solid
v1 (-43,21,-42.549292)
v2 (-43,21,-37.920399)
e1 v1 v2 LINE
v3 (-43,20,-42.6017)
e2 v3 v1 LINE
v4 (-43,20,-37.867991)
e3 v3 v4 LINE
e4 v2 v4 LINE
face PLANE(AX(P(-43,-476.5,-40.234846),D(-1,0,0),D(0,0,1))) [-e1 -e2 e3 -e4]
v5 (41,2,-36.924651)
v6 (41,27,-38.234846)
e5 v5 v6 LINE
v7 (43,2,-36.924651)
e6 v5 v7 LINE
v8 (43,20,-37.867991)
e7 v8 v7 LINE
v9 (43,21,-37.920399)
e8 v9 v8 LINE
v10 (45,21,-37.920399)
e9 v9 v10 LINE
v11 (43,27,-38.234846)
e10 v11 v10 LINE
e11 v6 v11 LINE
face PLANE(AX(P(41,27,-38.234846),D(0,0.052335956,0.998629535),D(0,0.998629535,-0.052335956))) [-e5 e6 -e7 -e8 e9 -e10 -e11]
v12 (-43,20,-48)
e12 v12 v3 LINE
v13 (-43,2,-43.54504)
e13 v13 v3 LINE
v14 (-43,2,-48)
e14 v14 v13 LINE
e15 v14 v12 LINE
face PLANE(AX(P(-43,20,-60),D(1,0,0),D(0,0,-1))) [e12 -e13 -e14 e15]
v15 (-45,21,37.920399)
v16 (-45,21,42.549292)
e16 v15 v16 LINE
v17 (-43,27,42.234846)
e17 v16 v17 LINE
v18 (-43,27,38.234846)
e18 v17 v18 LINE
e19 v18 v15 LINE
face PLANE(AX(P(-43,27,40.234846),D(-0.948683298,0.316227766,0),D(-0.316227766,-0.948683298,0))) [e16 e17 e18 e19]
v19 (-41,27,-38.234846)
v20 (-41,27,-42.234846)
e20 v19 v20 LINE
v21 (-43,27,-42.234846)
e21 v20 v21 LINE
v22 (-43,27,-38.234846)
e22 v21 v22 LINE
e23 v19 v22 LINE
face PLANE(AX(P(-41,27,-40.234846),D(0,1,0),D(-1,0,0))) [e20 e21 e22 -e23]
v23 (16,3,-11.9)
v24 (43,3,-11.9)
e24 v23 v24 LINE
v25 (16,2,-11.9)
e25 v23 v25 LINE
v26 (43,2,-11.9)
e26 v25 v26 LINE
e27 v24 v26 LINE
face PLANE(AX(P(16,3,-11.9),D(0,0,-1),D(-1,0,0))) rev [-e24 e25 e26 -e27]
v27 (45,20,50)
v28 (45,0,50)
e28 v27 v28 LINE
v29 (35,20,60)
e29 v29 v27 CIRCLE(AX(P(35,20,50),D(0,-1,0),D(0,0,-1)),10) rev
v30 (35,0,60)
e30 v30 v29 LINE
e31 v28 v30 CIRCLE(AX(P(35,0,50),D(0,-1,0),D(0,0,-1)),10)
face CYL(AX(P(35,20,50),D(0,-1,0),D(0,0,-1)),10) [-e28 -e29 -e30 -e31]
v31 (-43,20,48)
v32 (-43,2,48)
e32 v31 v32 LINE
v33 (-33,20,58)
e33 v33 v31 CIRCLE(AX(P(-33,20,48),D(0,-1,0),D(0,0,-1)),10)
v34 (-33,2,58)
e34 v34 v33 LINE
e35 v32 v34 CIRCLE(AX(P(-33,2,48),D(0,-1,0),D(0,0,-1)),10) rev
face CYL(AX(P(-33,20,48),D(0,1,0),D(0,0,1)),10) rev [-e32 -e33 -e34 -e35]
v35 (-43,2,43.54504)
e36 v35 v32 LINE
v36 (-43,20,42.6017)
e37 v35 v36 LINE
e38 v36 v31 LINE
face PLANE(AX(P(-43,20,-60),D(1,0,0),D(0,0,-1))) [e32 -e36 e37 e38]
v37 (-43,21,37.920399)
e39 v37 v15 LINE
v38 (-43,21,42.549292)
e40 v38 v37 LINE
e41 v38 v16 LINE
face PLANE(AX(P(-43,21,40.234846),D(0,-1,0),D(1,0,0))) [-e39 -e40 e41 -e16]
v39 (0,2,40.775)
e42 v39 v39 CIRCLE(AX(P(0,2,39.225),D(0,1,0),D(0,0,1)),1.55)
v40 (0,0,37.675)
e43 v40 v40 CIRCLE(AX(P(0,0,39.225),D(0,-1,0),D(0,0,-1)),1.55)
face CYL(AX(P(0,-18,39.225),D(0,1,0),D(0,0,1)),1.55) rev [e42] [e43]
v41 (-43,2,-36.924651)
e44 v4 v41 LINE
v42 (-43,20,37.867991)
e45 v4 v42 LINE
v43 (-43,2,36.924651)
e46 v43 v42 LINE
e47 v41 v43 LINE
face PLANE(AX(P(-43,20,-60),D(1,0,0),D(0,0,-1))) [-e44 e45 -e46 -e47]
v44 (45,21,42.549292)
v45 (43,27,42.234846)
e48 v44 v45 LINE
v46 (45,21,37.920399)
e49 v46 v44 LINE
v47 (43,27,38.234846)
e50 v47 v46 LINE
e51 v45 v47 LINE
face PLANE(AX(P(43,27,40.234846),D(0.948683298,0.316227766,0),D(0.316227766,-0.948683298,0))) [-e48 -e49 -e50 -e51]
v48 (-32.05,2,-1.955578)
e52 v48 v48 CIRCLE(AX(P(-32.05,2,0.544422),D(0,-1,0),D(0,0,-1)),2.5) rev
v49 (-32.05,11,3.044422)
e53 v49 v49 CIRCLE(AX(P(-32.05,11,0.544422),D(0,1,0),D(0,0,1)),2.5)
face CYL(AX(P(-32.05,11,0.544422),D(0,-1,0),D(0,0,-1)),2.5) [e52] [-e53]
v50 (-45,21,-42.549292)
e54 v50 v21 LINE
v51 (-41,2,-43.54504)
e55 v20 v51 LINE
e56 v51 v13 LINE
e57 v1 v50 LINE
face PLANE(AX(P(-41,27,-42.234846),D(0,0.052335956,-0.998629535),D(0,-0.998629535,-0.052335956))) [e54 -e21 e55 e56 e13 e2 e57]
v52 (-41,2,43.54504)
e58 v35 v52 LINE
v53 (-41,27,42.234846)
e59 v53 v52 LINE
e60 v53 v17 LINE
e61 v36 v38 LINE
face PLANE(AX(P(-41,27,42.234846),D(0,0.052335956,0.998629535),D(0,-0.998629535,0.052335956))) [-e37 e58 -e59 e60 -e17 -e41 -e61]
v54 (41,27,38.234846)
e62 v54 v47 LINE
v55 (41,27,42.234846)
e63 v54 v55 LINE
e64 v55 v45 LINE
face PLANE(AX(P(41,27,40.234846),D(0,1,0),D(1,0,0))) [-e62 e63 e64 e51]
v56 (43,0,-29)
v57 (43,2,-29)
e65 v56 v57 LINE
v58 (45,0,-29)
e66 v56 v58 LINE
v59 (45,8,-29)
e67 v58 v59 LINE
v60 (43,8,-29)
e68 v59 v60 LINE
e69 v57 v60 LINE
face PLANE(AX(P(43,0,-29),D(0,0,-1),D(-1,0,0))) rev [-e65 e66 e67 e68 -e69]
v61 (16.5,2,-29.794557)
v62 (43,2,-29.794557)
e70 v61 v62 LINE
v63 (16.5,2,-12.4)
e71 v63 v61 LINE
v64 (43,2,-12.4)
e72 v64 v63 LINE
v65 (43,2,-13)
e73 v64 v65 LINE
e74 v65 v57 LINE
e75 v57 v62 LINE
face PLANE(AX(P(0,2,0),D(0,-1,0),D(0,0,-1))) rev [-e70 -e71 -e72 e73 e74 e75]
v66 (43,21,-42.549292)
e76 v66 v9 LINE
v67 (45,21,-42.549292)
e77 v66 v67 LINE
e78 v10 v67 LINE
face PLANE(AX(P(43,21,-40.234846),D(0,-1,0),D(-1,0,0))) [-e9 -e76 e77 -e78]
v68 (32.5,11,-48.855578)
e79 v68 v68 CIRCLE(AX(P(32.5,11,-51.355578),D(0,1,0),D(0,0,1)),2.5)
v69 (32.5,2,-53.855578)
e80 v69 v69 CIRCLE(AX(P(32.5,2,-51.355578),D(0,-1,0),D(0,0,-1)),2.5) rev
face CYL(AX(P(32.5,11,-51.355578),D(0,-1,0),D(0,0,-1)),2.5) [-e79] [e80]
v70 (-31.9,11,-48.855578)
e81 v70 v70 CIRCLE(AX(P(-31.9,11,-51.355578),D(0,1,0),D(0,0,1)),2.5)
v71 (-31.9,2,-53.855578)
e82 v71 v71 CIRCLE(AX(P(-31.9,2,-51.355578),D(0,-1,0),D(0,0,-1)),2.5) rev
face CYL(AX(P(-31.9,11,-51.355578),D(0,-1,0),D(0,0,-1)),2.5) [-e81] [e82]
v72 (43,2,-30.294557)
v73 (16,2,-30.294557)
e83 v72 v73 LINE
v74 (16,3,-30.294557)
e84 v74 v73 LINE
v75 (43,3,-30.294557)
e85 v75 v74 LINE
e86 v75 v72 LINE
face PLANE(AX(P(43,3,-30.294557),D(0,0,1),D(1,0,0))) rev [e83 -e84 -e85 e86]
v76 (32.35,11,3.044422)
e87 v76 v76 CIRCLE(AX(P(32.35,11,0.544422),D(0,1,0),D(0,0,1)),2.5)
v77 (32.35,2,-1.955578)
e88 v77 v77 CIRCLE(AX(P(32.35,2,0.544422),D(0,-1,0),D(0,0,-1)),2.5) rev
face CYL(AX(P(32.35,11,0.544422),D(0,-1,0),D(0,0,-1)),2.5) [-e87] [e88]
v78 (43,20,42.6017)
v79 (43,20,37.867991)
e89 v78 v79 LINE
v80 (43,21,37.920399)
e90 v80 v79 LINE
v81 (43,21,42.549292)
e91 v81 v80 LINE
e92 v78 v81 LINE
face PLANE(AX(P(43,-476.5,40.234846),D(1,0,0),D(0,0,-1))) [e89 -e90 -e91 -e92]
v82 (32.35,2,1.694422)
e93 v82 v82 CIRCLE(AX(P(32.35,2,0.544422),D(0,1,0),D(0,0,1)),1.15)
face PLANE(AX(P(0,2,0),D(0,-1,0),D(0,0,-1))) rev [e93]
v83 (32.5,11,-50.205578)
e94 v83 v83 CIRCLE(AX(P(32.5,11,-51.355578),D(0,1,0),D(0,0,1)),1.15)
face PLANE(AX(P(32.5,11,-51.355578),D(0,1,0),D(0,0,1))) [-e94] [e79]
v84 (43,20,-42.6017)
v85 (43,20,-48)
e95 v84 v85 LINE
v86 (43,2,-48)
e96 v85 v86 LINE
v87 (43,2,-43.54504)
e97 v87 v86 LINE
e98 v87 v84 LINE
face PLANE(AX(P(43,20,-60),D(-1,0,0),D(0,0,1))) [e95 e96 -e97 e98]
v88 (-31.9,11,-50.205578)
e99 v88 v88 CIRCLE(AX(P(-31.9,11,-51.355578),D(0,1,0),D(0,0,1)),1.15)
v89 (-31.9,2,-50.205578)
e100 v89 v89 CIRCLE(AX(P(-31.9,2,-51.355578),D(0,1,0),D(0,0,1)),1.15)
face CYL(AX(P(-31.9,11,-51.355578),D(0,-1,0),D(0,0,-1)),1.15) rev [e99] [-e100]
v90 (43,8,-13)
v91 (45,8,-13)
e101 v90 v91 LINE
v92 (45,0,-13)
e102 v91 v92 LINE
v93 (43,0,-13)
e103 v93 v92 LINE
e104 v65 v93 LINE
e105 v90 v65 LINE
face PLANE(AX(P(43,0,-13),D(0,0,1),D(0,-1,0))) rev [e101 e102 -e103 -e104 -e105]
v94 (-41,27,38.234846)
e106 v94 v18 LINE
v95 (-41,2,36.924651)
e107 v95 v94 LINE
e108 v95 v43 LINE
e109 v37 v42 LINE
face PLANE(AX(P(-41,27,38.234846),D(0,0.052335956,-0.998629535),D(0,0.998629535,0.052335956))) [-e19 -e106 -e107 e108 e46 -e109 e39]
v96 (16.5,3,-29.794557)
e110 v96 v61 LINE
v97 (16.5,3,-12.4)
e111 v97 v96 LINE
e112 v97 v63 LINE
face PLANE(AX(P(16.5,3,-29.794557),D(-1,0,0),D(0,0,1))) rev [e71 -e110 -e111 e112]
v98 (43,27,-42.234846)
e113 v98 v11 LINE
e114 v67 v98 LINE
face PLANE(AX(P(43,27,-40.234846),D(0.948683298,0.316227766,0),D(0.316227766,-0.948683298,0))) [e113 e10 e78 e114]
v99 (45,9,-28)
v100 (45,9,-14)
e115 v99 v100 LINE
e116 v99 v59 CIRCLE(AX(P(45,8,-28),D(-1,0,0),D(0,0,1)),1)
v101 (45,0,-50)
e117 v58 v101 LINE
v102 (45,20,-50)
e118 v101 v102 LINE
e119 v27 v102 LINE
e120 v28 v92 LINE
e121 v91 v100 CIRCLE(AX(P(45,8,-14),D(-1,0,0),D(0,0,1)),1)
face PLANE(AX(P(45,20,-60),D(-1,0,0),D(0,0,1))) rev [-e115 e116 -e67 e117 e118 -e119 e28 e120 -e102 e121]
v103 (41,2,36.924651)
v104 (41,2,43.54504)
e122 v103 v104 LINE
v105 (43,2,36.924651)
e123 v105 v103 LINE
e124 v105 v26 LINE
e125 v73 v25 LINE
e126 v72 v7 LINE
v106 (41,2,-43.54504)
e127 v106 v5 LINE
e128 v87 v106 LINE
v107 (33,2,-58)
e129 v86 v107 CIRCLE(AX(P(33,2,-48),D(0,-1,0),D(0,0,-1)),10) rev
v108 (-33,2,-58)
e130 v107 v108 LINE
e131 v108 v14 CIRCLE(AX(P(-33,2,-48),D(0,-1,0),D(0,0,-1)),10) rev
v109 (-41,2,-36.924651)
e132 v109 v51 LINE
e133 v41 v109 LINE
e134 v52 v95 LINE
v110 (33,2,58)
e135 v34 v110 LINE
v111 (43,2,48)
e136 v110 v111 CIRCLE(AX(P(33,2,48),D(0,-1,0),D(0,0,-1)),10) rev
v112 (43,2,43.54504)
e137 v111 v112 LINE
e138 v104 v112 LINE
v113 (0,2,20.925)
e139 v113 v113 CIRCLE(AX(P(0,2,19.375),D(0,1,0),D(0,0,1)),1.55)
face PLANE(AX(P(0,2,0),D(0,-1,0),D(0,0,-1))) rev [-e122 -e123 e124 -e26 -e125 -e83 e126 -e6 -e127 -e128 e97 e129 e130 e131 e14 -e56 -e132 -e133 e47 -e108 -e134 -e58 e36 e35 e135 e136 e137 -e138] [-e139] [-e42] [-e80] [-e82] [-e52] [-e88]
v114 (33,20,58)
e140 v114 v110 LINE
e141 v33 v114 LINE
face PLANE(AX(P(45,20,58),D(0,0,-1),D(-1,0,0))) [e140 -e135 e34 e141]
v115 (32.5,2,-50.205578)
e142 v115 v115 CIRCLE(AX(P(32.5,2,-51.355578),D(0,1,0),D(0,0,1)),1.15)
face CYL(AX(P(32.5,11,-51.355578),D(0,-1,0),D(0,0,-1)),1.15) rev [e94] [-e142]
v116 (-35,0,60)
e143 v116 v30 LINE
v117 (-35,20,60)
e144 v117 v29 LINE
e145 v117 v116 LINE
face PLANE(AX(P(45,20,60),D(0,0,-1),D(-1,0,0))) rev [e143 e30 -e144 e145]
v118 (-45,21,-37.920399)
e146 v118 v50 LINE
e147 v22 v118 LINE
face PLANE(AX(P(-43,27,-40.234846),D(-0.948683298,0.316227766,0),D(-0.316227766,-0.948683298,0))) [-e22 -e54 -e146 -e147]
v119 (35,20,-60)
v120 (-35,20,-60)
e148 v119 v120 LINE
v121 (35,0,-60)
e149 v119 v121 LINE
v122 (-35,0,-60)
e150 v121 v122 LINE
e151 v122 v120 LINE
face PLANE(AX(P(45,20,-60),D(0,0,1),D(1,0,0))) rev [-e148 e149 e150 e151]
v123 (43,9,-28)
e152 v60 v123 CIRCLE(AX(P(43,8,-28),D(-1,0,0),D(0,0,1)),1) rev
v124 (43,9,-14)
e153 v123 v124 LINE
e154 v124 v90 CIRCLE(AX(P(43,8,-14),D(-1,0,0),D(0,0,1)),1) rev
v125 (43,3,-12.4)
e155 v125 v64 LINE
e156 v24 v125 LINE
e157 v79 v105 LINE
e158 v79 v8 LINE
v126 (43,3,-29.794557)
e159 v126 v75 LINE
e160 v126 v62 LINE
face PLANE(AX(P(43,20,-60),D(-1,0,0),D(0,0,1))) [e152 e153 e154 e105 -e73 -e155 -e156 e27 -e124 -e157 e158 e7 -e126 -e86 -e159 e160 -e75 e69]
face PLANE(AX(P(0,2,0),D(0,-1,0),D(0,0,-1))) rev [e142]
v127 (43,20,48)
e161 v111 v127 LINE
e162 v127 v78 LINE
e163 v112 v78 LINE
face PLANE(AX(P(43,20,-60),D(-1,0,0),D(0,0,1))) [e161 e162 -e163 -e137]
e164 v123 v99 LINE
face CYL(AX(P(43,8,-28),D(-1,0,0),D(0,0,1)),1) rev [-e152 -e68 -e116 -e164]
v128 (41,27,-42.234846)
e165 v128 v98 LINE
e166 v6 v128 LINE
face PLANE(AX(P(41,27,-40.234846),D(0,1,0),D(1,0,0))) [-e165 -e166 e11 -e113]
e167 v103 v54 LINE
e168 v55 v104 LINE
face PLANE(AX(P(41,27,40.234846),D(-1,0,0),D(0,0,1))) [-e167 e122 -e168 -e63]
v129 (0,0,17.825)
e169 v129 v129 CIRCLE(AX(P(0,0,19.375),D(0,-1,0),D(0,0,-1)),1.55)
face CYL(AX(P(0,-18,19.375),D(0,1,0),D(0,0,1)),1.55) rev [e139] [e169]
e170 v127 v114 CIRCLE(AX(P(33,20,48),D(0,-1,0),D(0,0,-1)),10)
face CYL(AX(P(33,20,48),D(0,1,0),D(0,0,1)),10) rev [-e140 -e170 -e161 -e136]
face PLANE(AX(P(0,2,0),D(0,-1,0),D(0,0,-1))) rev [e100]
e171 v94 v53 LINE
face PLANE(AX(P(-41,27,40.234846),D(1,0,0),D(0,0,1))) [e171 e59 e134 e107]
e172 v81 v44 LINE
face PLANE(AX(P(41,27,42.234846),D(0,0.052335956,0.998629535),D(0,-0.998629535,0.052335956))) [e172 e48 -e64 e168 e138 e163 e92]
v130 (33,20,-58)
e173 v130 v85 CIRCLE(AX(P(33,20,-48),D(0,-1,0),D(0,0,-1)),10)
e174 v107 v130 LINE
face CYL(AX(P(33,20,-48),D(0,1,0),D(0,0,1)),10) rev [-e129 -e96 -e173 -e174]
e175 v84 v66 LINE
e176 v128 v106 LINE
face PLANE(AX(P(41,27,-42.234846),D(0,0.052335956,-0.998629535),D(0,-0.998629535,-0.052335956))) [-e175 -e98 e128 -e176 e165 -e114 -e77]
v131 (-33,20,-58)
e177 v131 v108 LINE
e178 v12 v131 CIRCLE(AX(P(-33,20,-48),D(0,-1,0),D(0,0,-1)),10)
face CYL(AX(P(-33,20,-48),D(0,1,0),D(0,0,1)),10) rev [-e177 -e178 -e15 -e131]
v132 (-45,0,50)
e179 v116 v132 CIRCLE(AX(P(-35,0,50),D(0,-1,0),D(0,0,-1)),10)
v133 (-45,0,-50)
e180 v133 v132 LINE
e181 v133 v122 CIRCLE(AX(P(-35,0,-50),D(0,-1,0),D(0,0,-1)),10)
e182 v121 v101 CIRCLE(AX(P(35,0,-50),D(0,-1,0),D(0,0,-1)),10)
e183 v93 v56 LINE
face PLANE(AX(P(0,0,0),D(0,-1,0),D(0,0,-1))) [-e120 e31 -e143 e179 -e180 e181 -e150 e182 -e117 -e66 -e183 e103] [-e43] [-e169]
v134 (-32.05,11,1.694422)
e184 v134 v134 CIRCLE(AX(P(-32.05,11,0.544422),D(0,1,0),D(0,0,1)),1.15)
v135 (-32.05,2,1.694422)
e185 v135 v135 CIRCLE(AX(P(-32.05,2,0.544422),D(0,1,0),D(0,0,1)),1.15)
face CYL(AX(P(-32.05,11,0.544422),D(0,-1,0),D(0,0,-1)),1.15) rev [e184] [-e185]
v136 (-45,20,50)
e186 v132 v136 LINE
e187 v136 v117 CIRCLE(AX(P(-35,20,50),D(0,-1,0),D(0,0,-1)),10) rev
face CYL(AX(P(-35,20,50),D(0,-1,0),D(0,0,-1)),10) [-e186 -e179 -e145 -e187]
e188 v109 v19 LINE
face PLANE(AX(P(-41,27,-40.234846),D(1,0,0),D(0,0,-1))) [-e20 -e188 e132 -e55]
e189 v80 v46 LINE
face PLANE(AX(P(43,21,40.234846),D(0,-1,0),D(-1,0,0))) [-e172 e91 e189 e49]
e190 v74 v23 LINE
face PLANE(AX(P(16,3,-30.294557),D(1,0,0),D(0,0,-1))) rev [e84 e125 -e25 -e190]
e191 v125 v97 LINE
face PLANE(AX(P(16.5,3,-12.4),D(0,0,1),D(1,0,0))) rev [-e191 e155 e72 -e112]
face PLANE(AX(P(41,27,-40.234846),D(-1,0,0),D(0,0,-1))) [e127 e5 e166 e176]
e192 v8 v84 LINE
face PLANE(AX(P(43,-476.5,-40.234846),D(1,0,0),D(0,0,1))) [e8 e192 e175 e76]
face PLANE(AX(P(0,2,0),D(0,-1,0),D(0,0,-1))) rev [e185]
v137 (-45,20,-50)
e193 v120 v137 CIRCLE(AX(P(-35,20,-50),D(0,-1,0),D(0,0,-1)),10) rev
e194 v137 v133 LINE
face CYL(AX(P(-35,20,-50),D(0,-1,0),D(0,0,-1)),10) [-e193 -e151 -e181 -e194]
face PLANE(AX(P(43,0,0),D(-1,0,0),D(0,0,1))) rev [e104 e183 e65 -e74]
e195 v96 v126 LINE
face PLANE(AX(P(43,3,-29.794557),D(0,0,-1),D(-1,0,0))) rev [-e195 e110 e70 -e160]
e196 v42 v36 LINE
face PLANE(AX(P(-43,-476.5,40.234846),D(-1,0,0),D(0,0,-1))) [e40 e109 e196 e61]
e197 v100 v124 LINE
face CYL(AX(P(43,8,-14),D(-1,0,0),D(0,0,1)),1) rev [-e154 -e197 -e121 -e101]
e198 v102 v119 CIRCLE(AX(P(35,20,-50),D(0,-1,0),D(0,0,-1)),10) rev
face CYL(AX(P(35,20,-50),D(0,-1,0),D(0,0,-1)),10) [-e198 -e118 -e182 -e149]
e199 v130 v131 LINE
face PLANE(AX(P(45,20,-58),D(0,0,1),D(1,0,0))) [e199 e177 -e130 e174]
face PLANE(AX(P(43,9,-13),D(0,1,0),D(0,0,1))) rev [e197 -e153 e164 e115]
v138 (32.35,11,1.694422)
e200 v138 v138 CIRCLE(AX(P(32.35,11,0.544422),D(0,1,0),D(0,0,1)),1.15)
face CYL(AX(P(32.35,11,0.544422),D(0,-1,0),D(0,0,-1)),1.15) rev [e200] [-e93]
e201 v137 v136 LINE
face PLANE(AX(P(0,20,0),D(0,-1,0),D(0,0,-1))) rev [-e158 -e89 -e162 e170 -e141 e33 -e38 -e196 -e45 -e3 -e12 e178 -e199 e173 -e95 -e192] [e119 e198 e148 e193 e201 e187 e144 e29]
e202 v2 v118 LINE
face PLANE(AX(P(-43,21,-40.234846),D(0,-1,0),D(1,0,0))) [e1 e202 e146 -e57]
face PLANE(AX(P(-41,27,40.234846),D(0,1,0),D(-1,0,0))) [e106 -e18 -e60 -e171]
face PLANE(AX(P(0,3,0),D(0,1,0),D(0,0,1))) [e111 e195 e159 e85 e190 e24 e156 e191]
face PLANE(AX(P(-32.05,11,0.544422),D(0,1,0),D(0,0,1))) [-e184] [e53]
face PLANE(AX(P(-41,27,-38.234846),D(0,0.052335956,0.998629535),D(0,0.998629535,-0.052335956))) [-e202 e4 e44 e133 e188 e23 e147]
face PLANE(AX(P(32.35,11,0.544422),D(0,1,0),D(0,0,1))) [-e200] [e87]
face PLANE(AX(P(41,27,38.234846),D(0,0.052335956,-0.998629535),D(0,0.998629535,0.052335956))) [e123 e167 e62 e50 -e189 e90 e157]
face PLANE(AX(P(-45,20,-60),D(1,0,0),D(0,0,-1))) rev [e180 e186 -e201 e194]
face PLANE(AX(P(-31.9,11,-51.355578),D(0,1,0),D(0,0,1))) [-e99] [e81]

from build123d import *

# Parameters (mm, degrees)
CROQUIS2_W                   = 90
CROQUIS2_H                   = 120
SALIENTE_EXTRUIR1_DEPTH      = 20
VACIADO1_T                   = -2
REDONDEO1_R                  = 10
CROQUIS3_R                   = 1.55
CORTAR_EXTRUIR1_DEPTH        = 20
CROQUIS4_R                   = 2.5
CROQUIS4_R_2                 = 1.15
SALIENTE_EXTRUIR2_DEPTH      = 9
CROQUIS5_W                   = 16
CROQUIS5_H                   = 9
CORTAR_EXTRUIR2_DEPTH        = 2
REDONDEO2_R                  = 1
SALIENTE_EXTRUIR3_DEPTH      = 1
GANCHO_START                 = 41
GANCHO_DE_MOSQUET_N1_DEPTH   = 2
GANCHO_START_2               = -42.549292451
GANCHO_DE_MOSQUET_N1_2_DEPTH = 4.628893351
GANCHO_START_3               = 43
GANCHO_DE_MOSQUET_N1_3_DEPTH = 3
GANCHO_DE_MOSQUET_N1_4_DEPTH = 2
SIMETR_A2_START              = 41
SIMETR_A2_COPY_1_DEPTH       = 2
SIMETR_A2_START_2            = -42.549292451
SIMETR_A2_COPY_2_DEPTH       = 4.628893351
SIMETR_A2_START_3            = 43
SIMETR_A2_COPY_3_DEPTH       = 3
SIMETR_A2_COPY_4_DEPTH       = 2


with BuildPart() as part:
    # Croquis2 → Saliente-Extruir1 (new body)
    with BuildSketch(Plane(origin=(0, 0, 0), x_dir=(1, 0, 0), z_dir=(0, 1, 0))):
        Rectangle(CROQUIS2_W, CROQUIS2_H)
    extrude(amount=SALIENTE_EXTRUIR1_DEPTH)

    # Vaciado1
    vaciado1_openings = [part.faces().sort_by_distance(p)[0] for p in [
        (0, 20, 0),
    ]]
    offset(amount=VACIADO1_T, openings=vaciado1_openings, kind=Kind.INTERSECTION)

    # Redondeo1
    redondeo1_edges = [part.edges().sort_by_distance(p)[0] for p in [
        (-43, 11, -58),
        (-43, 11, 58),
        (43, 11, 58),
        (43, 11, -58),
        (-45, 10, -60),
        (45, 10, -60),
        (45, 10, 60),
        (-45, 10, 60),
    ]]
    fillet(redondeo1_edges, radius=REDONDEO1_R)

    # Croquis3 → Cortar-Extruir1 (cut)
    with BuildSketch(Plane(origin=(0, 2, 0), x_dir=(1, 0, 0), z_dir=(0, 1, 0))):
        with Locations(Location((0, -39.225, 0), (0, 0, 270))):
            Circle(CROQUIS3_R)
        with Locations(Location((0, -19.375, 0), (0, 0, 270))):
            Circle(CROQUIS3_R)
    extrude(amount=-CORTAR_EXTRUIR1_DEPTH, mode=Mode.SUBTRACT)

    # Croquis4 → Saliente-Extruir2 (add)
    # profile 1 of 4: a face of its own
    with BuildSketch(Plane(origin=(0, 2, 0), x_dir=(1, 0, 0), z_dir=(0, 1, 0))):
        with Locations(Location((-31.9, 51.355578, 0), (0, 0, 90))):
            Circle(CROQUIS4_R)
        with Locations(Location((-31.9, 51.355578, 0), (0, 0, 270))):
            Circle(CROQUIS4_R_2, mode=Mode.SUBTRACT)
    # profile 2 of 4: a face of its own
    with BuildSketch(Plane(origin=(0, 2, 0), x_dir=(1, 0, 0), z_dir=(0, 1, 0))):
        with Locations(Location((32.5, 51.355578, 0), (0, 0, 90))):
            Circle(CROQUIS4_R)
        with Locations(Location((32.5, 51.355578, 0), (0, 0, 270))):
            Circle(CROQUIS4_R_2, mode=Mode.SUBTRACT)
    # profile 3 of 4: a face of its own
    with BuildSketch(Plane(origin=(0, 2, 0), x_dir=(1, 0, 0), z_dir=(0, 1, 0))):
        with Locations(Location((32.35, -0.544422, 0), (0, 0, 90))):
            Circle(CROQUIS4_R)
        with Locations(Location((32.35, -0.544422, 0), (0, 0, 270))):
            Circle(CROQUIS4_R_2, mode=Mode.SUBTRACT)
    # profile 4 of 4: a face of its own
    with BuildSketch(Plane(origin=(0, 2, 0), x_dir=(1, 0, 0), z_dir=(0, 1, 0))):
        with Locations(Location((-32.05, -0.544422, 0), (0, 0, 90))):
            Circle(CROQUIS4_R)
        with Locations(Location((-32.05, -0.544422, 0), (0, 0, 270))):
            Circle(CROQUIS4_R_2, mode=Mode.SUBTRACT)
    extrude(amount=SALIENTE_EXTRUIR2_DEPTH)

    # Croquis5 → Cortar-Extruir2 (cut)
    with BuildSketch(Plane(origin=(45, 0, 0), x_dir=(0, 0, -1), z_dir=(1, 0, 0))):
        with Locations((21, 4.5)):
            Rectangle(CROQUIS5_W, CROQUIS5_H)
    extrude(amount=-CORTAR_EXTRUIR2_DEPTH, mode=Mode.SUBTRACT)

    # Redondeo2
    redondeo2_edges = [part.edges().sort_by_distance(p)[0] for p in [
        (44, 9, -13),
        (44, 9, -29),
    ]]
    fillet(redondeo2_edges, radius=REDONDEO2_R)

    # Croquis6 → Saliente-Extruir3 (add)
    with BuildSketch(Plane(origin=(0, 2, 0), x_dir=(1, 0, 0), z_dir=(0, 1, 0))):
        Polygon((43, 29.794557256), (16.5, 29.794557256), (16.5, 12.4), (43, 12.4), (43, 11.9), (16, 11.9), (16, 30.294557256), (43, 30.294557256), align=None)
    extrude(amount=SALIENTE_EXTRUIR3_DEPTH)



with BuildPart() as body_2:
    # Gancho de mosquetón1: read off the stored shape, not the designer's step
    # Gancho de mosquetón1 outline → Gancho de mosquetón1 (new body)
    with BuildSketch(Plane.YZ.offset(GANCHO_START)):
        Polygon((21, -37.9203991), (21, -42.549292451), (27, -42.234845775), (27, -38.234845775), align=None)
    gancho_de_mosquet_n1 = extrude(amount=GANCHO_DE_MOSQUET_N1_DEPTH)

    # Gancho de mosquet_n1 2 outline → Gancho de mosquet_n1 2 (add)
    with BuildSketch(Plane.XY.offset(GANCHO_START_2)):
        Polygon((43, 21), (45, 21), (43, 27), align=None)
    gancho_de_mosquet_n1_2 = extrude(amount=GANCHO_DE_MOSQUET_N1_2_DEPTH)

    # Gancho de mosquet_n1 3 outline → Gancho de mosquet_n1 3 (cut)
    with BuildSketch(Plane.YZ.offset(GANCHO_START_3)):
        Polygon((27, -42.234845775), (21, -42.549292451), (28, -42.549292451), (28, -42.182437996), align=None)
        Polygon((28, -37.9203991), (21, -37.9203991), (27, -38.234845775), (28, -38.287253554), align=None)
    gancho_de_mosquet_n1_3 = extrude(amount=GANCHO_DE_MOSQUET_N1_3_DEPTH, mode=Mode.SUBTRACT)


with BuildPart() as part_1:
    add(part.part)

    add(body_2.part)  # Gancho de mosquet_n1 4 merges body 2
    # Gancho de mosquet_n1 4 outline → Gancho de mosquet_n1 4 (add)
    with BuildSketch(Plane.YZ.offset(GANCHO_START)):
        Polygon((1, -43.597448037), (2, -43.545040258), (21, -42.549292451), (21, -37.9203991), (2, -36.924651293), (1, -36.872243514), align=None)
    gancho_de_mosquet_n1_4 = extrude(amount=GANCHO_DE_MOSQUET_N1_4_DEPTH)

    # Simetría1: Gancho de mosquetón1, Gancho de mosquet_n1 2, Gancho de mosquet_n1 3, Gancho de mosquet_n1 4 across plane
    add(gancho_de_mosquet_n1.mirror(Plane.XY))
    add(gancho_de_mosquet_n1_2.mirror(Plane.XY))
    add(gancho_de_mosquet_n1_3.mirror(Plane.XY), mode=Mode.SUBTRACT)
    add(gancho_de_mosquet_n1_4.mirror(Plane.XY))

    # Simetría2: Gancho de mosquetón1, Gancho de mosquet_n1 2, Gancho de mosquet_n1 3, Gancho de mosquet_n1 4 across plane
    add(gancho_de_mosquet_n1.mirror(Plane(origin=(0, 0, 0), x_dir=(0, 0, 1), z_dir=(1, 0, 0))))
    add(gancho_de_mosquet_n1_2.mirror(Plane(origin=(0, 0, 0), x_dir=(0, 0, 1), z_dir=(1, 0, 0))))
    add(gancho_de_mosquet_n1_3.mirror(Plane(origin=(0, 0, 0), x_dir=(0, 0, 1), z_dir=(1, 0, 0))), mode=Mode.SUBTRACT)
    add(gancho_de_mosquet_n1_4.mirror(Plane(origin=(0, 0, 0), x_dir=(0, 0, 1), z_dir=(1, 0, 0))))



with BuildPart() as body_2_2:
    # Simetría2 copy 1 sketch → Simetría2 copy 1 (new body)
    with BuildSketch(Plane(origin=(0, 0, 0), x_dir=(0, 1, 0), z_dir=(-1, 0, 0)).offset(SIMETR_A2_START)):
        Polygon((21, -37.9203991), (21, -42.549292451), (27, -42.234845775), (27, -38.234845775), align=None)
    extrude(amount=SIMETR_A2_COPY_1_DEPTH)

    # Simetría2 copy 2 sketch → Simetría2 copy 2 (add)
    with BuildSketch(Plane(origin=(0, 0, 0), x_dir=(-1, 0, 0), z_dir=(0, 0, -1)).offset(SIMETR_A2_START_2)):
        Polygon((43, 21), (45, 21), (43, 27), align=None)
    extrude(amount=SIMETR_A2_COPY_2_DEPTH)

    # Simetría2 copy 3 sketch → Simetría2 copy 3 (cut)
    with BuildSketch(Plane(origin=(0, 0, 0), x_dir=(0, 1, 0), z_dir=(-1, 0, 0)).offset(SIMETR_A2_START_3)):
        Polygon((27, -42.234845775), (21, -42.549292451), (28, -42.549292451), (28, -42.182437996), align=None)
        Polygon((28, -37.9203991), (21, -37.9203991), (27, -38.234845775), (28, -38.287253554), align=None)
    extrude(amount=SIMETR_A2_COPY_3_DEPTH, mode=Mode.SUBTRACT)


with BuildPart() as part_2:
    add(part_1.part)

    add(body_2_2.part)  # Simetría2 copy 4 merges body 2 2
    # Simetría2 copy 4 sketch → Simetría2 copy 4 (add)
    with BuildSketch(Plane(origin=(0, 0, 0), x_dir=(0, 1, 0), z_dir=(-1, 0, 0)).offset(SIMETR_A2_START)):
        Polygon((1, -43.597448037), (2, -43.545040258), (21, -42.549292451), (21, -37.9203991), (2, -36.924651293), (1, -36.872243514), align=None)
    extrude(amount=SIMETR_A2_COPY_4_DEPTH)


solid = part_2.part
